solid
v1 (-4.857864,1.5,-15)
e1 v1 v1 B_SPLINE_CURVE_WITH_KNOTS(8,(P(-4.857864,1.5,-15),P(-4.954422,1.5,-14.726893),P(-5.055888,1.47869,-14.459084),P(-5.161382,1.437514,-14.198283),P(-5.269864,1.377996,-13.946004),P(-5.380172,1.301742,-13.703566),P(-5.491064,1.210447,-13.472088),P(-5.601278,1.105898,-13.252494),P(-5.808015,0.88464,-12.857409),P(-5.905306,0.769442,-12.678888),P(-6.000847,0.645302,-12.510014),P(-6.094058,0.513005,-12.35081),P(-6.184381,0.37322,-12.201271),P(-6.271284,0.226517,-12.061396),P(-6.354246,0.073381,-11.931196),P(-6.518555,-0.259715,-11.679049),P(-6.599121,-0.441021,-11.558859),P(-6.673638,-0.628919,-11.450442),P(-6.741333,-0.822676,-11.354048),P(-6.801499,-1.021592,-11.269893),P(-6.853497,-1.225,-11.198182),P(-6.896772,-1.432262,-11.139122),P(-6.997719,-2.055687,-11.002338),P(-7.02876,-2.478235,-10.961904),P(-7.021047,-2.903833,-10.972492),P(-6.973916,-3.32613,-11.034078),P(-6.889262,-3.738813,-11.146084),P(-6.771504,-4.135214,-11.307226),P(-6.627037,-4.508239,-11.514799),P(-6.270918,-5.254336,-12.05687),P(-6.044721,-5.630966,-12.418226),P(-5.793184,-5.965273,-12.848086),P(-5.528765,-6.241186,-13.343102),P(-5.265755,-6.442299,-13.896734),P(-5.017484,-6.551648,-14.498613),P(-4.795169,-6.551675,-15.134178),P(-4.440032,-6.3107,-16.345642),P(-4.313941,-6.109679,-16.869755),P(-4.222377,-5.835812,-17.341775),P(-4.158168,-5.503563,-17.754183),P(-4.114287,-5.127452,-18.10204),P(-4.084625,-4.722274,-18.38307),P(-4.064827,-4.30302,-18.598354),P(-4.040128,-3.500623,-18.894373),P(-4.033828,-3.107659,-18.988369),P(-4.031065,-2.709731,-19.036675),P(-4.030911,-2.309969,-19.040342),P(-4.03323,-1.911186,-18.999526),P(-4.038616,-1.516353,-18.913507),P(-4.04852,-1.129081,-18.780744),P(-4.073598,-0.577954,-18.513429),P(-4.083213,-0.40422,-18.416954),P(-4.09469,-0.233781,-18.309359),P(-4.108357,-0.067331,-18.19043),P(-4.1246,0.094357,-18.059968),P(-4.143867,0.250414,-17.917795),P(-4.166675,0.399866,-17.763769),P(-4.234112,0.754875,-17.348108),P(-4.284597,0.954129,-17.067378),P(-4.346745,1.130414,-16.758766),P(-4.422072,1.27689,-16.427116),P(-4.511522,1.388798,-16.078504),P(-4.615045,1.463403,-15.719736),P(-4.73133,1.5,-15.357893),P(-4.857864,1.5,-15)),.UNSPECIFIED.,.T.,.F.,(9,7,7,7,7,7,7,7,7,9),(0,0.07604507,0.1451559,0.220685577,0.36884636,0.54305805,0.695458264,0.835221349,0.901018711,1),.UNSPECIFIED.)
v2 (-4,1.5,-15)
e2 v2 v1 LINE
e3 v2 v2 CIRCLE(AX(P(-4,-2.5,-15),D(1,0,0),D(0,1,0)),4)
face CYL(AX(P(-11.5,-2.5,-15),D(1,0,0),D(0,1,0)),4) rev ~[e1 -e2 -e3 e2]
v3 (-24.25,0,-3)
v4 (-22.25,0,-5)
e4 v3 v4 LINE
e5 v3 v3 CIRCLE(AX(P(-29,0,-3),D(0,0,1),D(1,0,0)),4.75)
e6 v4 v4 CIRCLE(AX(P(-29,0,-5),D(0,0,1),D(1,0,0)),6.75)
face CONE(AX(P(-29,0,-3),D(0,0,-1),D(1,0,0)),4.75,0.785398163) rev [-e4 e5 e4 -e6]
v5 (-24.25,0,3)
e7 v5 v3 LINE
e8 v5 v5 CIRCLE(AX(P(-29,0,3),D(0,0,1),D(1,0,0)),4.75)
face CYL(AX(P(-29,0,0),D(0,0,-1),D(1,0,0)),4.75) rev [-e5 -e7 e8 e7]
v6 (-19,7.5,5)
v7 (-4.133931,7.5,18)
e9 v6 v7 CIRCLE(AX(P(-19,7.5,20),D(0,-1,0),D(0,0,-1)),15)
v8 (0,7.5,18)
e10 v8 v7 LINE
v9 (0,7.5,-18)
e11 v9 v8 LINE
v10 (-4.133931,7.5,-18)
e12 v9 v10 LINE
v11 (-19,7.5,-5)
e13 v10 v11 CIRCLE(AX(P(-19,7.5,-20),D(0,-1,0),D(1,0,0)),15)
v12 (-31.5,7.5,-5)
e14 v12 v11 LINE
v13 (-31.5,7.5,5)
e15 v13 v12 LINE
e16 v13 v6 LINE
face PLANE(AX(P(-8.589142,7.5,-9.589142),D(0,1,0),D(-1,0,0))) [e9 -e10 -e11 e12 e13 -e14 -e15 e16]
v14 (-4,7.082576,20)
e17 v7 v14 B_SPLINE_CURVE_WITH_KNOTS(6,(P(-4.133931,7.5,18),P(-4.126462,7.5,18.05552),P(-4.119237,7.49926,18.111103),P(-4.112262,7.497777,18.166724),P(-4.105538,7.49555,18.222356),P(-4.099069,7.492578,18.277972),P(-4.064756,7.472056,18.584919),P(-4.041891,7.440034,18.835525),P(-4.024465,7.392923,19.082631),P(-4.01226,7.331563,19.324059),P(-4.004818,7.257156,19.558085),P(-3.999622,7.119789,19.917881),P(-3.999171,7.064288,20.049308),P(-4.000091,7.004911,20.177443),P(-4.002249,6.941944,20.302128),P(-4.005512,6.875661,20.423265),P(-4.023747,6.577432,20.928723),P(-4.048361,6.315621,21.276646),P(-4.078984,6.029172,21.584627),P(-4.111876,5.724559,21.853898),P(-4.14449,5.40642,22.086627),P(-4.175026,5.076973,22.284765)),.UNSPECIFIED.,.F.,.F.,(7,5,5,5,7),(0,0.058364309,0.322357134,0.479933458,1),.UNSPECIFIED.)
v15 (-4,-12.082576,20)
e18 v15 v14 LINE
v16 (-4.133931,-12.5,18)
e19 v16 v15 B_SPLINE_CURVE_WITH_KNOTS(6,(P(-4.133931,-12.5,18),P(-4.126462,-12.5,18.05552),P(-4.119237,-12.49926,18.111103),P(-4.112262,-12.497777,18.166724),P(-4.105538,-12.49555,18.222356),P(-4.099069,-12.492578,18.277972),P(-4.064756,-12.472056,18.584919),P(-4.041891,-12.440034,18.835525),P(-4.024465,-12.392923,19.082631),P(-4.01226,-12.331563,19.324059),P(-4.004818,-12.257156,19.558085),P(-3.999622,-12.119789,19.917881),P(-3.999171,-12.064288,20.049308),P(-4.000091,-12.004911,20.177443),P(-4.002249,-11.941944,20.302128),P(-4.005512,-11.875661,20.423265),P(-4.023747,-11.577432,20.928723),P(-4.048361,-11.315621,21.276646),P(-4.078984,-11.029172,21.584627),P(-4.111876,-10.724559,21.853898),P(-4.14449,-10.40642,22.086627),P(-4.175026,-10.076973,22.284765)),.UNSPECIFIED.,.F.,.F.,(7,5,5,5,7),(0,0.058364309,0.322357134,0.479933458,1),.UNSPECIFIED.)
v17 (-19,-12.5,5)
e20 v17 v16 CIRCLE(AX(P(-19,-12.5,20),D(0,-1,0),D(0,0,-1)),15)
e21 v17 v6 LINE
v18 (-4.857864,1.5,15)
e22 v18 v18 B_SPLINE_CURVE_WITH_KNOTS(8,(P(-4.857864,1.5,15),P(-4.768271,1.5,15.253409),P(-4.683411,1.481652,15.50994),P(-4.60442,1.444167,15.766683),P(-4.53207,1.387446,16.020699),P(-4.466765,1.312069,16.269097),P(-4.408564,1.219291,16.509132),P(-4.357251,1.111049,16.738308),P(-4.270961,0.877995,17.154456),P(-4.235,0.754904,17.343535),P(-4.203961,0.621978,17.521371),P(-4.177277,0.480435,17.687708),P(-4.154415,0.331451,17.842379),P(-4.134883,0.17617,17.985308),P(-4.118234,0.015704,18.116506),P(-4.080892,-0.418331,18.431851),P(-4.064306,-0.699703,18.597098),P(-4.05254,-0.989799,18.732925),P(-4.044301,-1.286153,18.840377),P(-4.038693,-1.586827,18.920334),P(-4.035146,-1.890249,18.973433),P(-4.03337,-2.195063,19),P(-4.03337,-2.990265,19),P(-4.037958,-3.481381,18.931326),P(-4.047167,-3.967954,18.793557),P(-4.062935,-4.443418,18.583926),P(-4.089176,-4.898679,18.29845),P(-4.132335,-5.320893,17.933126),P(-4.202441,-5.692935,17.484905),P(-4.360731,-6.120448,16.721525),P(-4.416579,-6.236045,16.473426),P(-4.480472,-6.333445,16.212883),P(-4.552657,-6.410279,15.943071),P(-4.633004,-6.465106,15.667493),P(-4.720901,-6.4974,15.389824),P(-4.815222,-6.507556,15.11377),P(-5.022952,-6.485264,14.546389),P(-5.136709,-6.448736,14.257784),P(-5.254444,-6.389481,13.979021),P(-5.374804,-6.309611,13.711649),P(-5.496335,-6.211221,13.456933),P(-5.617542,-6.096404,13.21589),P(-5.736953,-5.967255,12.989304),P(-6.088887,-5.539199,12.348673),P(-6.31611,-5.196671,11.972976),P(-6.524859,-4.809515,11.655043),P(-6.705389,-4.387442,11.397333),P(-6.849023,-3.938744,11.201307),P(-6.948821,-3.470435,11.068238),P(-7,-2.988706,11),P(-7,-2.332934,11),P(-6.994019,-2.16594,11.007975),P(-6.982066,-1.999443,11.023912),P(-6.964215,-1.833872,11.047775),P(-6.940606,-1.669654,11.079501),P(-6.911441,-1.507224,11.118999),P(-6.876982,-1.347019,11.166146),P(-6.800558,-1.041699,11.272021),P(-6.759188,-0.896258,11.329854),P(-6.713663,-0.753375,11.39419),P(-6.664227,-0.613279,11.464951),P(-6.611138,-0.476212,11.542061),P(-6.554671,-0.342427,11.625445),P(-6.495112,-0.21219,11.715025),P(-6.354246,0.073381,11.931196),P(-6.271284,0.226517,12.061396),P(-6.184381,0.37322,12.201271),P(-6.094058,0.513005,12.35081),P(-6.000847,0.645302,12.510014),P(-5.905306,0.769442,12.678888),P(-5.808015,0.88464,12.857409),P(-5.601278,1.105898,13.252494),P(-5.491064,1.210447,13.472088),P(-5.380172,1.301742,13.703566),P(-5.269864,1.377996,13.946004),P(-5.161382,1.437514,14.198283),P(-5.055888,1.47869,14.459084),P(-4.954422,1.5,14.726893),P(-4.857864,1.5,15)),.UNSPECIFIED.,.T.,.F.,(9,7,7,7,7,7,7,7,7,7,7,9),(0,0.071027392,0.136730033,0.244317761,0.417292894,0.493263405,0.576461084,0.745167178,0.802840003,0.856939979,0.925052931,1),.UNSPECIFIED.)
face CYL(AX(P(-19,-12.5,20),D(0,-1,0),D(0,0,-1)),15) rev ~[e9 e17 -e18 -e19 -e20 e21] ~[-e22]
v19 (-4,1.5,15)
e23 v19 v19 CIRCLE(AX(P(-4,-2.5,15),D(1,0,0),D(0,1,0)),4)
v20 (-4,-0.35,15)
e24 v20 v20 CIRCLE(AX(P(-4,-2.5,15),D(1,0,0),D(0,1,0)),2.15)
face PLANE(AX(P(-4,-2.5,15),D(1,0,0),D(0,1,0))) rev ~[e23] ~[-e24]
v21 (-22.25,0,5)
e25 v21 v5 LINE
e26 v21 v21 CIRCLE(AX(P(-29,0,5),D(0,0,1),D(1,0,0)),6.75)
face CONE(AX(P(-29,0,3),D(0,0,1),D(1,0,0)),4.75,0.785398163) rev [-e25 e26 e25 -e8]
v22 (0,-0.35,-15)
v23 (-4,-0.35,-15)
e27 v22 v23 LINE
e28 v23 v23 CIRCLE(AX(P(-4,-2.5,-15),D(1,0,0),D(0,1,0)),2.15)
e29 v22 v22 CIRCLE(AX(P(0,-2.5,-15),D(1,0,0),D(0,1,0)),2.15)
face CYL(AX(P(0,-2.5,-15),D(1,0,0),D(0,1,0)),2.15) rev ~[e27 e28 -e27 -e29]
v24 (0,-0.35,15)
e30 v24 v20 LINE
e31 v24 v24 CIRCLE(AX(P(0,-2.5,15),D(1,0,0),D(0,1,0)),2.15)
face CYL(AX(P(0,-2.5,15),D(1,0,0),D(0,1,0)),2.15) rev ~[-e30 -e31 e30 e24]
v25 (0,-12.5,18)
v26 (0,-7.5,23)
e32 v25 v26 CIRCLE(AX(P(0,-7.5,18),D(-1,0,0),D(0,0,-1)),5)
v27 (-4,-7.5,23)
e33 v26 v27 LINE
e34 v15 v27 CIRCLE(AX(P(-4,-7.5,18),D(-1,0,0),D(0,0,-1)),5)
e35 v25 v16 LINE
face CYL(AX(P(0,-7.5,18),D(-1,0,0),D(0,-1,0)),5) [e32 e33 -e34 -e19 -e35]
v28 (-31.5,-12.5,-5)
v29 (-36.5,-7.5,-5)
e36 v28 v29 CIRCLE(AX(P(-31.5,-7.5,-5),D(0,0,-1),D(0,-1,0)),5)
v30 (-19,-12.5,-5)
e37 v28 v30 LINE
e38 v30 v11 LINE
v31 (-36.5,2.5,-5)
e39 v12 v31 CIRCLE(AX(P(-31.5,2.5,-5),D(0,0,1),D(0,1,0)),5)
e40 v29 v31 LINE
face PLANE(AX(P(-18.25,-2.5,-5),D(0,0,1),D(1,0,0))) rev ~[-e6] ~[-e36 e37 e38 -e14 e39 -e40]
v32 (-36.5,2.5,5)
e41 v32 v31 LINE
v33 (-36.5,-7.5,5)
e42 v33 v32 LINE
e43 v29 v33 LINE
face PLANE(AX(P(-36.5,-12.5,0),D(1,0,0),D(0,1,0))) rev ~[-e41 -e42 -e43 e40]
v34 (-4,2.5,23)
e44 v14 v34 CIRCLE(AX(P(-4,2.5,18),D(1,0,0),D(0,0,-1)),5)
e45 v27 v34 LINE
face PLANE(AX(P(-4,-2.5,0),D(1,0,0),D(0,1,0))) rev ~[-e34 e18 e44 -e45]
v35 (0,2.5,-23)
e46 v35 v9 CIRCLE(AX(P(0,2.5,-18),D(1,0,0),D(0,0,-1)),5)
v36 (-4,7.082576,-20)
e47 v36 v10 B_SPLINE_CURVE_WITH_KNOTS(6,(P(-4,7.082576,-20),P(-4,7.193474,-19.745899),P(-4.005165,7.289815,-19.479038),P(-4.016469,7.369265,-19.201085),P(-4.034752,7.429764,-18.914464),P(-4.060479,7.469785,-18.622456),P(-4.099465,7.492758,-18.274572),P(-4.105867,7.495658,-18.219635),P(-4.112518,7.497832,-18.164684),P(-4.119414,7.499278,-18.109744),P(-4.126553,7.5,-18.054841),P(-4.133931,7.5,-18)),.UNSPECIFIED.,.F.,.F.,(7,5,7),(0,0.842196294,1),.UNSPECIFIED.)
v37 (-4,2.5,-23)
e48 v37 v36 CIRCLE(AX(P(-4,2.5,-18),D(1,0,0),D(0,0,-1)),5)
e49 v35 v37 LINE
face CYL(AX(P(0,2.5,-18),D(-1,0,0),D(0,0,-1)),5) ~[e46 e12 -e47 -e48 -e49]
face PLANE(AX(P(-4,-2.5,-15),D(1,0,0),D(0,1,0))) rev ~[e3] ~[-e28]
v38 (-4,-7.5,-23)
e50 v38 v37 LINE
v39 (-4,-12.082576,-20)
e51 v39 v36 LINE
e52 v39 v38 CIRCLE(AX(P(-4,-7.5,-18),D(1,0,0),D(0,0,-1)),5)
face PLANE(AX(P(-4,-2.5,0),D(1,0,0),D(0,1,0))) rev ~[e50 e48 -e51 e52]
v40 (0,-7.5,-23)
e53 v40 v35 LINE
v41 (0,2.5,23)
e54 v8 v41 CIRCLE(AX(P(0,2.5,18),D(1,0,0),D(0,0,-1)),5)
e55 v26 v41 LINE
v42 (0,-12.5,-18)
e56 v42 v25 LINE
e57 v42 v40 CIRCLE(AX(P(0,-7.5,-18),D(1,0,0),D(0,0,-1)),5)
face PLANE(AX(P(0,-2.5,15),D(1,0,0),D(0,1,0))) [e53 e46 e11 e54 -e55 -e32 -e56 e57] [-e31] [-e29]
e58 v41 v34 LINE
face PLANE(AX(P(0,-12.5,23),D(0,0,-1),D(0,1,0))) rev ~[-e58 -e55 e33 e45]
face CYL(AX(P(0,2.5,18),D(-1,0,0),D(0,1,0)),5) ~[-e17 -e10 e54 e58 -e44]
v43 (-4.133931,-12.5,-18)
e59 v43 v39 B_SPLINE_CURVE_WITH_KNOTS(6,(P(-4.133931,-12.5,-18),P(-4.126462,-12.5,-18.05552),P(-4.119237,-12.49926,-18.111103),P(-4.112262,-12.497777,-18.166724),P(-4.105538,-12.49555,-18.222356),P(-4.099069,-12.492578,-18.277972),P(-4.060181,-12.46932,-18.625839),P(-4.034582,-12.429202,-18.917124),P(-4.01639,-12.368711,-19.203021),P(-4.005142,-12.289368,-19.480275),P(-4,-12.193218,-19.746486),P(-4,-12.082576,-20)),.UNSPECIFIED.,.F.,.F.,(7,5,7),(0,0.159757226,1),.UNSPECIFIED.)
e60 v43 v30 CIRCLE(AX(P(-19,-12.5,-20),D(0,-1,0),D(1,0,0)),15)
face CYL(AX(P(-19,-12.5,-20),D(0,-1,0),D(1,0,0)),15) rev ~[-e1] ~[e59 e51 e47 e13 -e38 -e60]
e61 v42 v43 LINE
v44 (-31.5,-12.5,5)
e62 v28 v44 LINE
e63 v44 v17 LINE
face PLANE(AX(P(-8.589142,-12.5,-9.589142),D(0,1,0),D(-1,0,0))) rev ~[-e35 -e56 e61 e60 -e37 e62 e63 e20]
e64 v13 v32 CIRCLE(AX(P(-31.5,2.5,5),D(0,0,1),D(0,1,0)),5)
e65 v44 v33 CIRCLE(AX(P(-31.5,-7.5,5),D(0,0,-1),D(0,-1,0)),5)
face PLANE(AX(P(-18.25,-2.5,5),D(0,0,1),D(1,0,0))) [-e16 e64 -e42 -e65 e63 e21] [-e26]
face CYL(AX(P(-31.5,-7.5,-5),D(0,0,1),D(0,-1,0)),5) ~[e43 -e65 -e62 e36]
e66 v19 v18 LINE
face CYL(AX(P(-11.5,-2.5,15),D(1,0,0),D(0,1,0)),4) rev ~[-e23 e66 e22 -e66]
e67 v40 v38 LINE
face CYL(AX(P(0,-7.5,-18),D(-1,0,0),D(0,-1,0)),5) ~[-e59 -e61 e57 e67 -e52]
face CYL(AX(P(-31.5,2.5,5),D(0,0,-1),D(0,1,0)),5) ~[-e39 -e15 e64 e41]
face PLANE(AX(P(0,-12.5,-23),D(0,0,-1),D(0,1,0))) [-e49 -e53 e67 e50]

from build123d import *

# Parameters (mm, degrees)
F0_W          = 36.5
F0_H          = 20
F0_R          = 4.75
F1_DEPTH      = 5
F1_DEPTH_BACK = 5
F2_SIZE       = 2
F3_W          = 20
F3_H          = 46
F3_R          = 4
F4_DEPTH      = 4
F5_T4_DEPTH   = 20
F5_S5_R       = 4
F5_T6_DEPTH   = 16
F5_T10_DEPTH  = 20
F5_S11_R      = 4
F5_T12_DEPTH  = 16
F3_R_2        = 2.15
F6_DEPTH      = 4
F7_R          = 5
F8_R          = 5


# Not quite as in the source:
# - a fillet or chamfer that OpenCascade refuses, or shapes differently, is made with other operations: its cross-section is extruded or revolved along the edge and cut away or added


with BuildPart() as f1:
    # F0 (on Top) → F1 (new body, two sides)
    with BuildSketch(Plane.XY) as f1_sk:
        with Locations((-18.25, -2.5)):
            Rectangle(F0_W, F0_H)
        with Locations((-29, 0)):
            Circle(F0_R, mode=Mode.SUBTRACT)
    extrude(amount=F1_DEPTH)
    extrude(f1_sk.sketch, amount=-F1_DEPTH_BACK)

    # F2
    f2_edges = [f1.edges().sort_by_distance(p)[0] for p in [
        (-33.75, 0, 5),
        (-33.75, 0, -5),
    ]]
    chamfer(f2_edges, length=F2_SIZE)

    # F3 (on Right) → F4 (join)
    with BuildSketch(Plane.YZ):
        with Locations((-2.5, 0)):
            Rectangle(F3_W, F3_H)
        with Locations((-2.5, -15)):
            Circle(F3_R, mode=Mode.SUBTRACT)
        with Locations((-2.5, 15)):
            Circle(F3_R, mode=Mode.SUBTRACT)
    extrude(amount=-F4_DEPTH)

    # F5: fillet of radius 15 on 2 edges, made by hand


with BuildPart() as f5_tool2:
    # F5_s3 → F5_t4 (new body)
    with BuildSketch(Plane.XZ.offset(12.5)):
        with BuildLine():
            ThreePointArc((-19, 5), (-8.3933982822, 9.3933982822), (-4, 20))
            Line((-4, 20), (-4, 5))
            Line((-4, 5), (-19, 5))
        make_face()
    extrude(amount=-F5_T4_DEPTH)

    # F5_s5 → F5_t6 (cut, symmetric)
    with BuildSketch(Plane.YZ.offset(-11.5)):
        with Locations((-2.5, 15)):
            Circle(F5_S5_R)
    extrude(amount=F5_T6_DEPTH, both=True, mode=Mode.SUBTRACT)


with BuildPart() as f1_1:
    add(f1.part)

    # F5_t1: union F5_tool2
    add(f5_tool2.part)


with BuildPart() as f5_tool8:
    # F5_s9 → F5_t10 (new body)
    with BuildSketch(Plane.XZ.offset(12.5)):
        with BuildLine():
            ThreePointArc((-4, -20), (-8.3933982822, -9.3933982822), (-19, -5))
            Line((-19, -5), (-4, -5))
            Line((-4, -5), (-4, -20))
        make_face()
    extrude(amount=-F5_T10_DEPTH)

    # F5_s11 → F5_t12 (cut, symmetric)
    with BuildSketch(Plane.YZ.offset(-11.5)):
        with Locations((-2.5, -15)):
            Circle(F5_S11_R)
    extrude(amount=F5_T12_DEPTH, both=True, mode=Mode.SUBTRACT)


with BuildPart() as f1_2:
    add(f1_1.part)

    # F5_t7: union F5_tool8
    add(f5_tool8.part)

    # F3 (on Right) → F6 (join)
    with BuildSketch(Plane.YZ):
        with Locations((-2.5, 15)):
            Circle(F3_R)
        with Locations((-2.5, 15)):
            Circle(F3_R_2, mode=Mode.SUBTRACT)
        with Locations((-2.5, -15)):
            Circle(F3_R)
        with Locations((-2.5, -15)):
            Circle(F3_R_2, mode=Mode.SUBTRACT)
    extrude(amount=-F6_DEPTH)

    # F7
    f7_edges = [f1_2.edges().sort_by_distance(p)[0] for p in [
        (-2, -12.5, -23),
        (-2, -12.5, 23),
        (-2, 7.5, -23),
        (-2, 7.5, 23),
    ]]
    fillet(f7_edges, radius=F7_R)

    # F8
    f8_edges = [f1_2.edges().sort_by_distance(p)[0] for p in [
        (-36.5, -12.5, 0),
        (-36.5, 7.5, 0),
    ]]
    fillet(f8_edges, radius=F8_R)


solid = f1_2.part
